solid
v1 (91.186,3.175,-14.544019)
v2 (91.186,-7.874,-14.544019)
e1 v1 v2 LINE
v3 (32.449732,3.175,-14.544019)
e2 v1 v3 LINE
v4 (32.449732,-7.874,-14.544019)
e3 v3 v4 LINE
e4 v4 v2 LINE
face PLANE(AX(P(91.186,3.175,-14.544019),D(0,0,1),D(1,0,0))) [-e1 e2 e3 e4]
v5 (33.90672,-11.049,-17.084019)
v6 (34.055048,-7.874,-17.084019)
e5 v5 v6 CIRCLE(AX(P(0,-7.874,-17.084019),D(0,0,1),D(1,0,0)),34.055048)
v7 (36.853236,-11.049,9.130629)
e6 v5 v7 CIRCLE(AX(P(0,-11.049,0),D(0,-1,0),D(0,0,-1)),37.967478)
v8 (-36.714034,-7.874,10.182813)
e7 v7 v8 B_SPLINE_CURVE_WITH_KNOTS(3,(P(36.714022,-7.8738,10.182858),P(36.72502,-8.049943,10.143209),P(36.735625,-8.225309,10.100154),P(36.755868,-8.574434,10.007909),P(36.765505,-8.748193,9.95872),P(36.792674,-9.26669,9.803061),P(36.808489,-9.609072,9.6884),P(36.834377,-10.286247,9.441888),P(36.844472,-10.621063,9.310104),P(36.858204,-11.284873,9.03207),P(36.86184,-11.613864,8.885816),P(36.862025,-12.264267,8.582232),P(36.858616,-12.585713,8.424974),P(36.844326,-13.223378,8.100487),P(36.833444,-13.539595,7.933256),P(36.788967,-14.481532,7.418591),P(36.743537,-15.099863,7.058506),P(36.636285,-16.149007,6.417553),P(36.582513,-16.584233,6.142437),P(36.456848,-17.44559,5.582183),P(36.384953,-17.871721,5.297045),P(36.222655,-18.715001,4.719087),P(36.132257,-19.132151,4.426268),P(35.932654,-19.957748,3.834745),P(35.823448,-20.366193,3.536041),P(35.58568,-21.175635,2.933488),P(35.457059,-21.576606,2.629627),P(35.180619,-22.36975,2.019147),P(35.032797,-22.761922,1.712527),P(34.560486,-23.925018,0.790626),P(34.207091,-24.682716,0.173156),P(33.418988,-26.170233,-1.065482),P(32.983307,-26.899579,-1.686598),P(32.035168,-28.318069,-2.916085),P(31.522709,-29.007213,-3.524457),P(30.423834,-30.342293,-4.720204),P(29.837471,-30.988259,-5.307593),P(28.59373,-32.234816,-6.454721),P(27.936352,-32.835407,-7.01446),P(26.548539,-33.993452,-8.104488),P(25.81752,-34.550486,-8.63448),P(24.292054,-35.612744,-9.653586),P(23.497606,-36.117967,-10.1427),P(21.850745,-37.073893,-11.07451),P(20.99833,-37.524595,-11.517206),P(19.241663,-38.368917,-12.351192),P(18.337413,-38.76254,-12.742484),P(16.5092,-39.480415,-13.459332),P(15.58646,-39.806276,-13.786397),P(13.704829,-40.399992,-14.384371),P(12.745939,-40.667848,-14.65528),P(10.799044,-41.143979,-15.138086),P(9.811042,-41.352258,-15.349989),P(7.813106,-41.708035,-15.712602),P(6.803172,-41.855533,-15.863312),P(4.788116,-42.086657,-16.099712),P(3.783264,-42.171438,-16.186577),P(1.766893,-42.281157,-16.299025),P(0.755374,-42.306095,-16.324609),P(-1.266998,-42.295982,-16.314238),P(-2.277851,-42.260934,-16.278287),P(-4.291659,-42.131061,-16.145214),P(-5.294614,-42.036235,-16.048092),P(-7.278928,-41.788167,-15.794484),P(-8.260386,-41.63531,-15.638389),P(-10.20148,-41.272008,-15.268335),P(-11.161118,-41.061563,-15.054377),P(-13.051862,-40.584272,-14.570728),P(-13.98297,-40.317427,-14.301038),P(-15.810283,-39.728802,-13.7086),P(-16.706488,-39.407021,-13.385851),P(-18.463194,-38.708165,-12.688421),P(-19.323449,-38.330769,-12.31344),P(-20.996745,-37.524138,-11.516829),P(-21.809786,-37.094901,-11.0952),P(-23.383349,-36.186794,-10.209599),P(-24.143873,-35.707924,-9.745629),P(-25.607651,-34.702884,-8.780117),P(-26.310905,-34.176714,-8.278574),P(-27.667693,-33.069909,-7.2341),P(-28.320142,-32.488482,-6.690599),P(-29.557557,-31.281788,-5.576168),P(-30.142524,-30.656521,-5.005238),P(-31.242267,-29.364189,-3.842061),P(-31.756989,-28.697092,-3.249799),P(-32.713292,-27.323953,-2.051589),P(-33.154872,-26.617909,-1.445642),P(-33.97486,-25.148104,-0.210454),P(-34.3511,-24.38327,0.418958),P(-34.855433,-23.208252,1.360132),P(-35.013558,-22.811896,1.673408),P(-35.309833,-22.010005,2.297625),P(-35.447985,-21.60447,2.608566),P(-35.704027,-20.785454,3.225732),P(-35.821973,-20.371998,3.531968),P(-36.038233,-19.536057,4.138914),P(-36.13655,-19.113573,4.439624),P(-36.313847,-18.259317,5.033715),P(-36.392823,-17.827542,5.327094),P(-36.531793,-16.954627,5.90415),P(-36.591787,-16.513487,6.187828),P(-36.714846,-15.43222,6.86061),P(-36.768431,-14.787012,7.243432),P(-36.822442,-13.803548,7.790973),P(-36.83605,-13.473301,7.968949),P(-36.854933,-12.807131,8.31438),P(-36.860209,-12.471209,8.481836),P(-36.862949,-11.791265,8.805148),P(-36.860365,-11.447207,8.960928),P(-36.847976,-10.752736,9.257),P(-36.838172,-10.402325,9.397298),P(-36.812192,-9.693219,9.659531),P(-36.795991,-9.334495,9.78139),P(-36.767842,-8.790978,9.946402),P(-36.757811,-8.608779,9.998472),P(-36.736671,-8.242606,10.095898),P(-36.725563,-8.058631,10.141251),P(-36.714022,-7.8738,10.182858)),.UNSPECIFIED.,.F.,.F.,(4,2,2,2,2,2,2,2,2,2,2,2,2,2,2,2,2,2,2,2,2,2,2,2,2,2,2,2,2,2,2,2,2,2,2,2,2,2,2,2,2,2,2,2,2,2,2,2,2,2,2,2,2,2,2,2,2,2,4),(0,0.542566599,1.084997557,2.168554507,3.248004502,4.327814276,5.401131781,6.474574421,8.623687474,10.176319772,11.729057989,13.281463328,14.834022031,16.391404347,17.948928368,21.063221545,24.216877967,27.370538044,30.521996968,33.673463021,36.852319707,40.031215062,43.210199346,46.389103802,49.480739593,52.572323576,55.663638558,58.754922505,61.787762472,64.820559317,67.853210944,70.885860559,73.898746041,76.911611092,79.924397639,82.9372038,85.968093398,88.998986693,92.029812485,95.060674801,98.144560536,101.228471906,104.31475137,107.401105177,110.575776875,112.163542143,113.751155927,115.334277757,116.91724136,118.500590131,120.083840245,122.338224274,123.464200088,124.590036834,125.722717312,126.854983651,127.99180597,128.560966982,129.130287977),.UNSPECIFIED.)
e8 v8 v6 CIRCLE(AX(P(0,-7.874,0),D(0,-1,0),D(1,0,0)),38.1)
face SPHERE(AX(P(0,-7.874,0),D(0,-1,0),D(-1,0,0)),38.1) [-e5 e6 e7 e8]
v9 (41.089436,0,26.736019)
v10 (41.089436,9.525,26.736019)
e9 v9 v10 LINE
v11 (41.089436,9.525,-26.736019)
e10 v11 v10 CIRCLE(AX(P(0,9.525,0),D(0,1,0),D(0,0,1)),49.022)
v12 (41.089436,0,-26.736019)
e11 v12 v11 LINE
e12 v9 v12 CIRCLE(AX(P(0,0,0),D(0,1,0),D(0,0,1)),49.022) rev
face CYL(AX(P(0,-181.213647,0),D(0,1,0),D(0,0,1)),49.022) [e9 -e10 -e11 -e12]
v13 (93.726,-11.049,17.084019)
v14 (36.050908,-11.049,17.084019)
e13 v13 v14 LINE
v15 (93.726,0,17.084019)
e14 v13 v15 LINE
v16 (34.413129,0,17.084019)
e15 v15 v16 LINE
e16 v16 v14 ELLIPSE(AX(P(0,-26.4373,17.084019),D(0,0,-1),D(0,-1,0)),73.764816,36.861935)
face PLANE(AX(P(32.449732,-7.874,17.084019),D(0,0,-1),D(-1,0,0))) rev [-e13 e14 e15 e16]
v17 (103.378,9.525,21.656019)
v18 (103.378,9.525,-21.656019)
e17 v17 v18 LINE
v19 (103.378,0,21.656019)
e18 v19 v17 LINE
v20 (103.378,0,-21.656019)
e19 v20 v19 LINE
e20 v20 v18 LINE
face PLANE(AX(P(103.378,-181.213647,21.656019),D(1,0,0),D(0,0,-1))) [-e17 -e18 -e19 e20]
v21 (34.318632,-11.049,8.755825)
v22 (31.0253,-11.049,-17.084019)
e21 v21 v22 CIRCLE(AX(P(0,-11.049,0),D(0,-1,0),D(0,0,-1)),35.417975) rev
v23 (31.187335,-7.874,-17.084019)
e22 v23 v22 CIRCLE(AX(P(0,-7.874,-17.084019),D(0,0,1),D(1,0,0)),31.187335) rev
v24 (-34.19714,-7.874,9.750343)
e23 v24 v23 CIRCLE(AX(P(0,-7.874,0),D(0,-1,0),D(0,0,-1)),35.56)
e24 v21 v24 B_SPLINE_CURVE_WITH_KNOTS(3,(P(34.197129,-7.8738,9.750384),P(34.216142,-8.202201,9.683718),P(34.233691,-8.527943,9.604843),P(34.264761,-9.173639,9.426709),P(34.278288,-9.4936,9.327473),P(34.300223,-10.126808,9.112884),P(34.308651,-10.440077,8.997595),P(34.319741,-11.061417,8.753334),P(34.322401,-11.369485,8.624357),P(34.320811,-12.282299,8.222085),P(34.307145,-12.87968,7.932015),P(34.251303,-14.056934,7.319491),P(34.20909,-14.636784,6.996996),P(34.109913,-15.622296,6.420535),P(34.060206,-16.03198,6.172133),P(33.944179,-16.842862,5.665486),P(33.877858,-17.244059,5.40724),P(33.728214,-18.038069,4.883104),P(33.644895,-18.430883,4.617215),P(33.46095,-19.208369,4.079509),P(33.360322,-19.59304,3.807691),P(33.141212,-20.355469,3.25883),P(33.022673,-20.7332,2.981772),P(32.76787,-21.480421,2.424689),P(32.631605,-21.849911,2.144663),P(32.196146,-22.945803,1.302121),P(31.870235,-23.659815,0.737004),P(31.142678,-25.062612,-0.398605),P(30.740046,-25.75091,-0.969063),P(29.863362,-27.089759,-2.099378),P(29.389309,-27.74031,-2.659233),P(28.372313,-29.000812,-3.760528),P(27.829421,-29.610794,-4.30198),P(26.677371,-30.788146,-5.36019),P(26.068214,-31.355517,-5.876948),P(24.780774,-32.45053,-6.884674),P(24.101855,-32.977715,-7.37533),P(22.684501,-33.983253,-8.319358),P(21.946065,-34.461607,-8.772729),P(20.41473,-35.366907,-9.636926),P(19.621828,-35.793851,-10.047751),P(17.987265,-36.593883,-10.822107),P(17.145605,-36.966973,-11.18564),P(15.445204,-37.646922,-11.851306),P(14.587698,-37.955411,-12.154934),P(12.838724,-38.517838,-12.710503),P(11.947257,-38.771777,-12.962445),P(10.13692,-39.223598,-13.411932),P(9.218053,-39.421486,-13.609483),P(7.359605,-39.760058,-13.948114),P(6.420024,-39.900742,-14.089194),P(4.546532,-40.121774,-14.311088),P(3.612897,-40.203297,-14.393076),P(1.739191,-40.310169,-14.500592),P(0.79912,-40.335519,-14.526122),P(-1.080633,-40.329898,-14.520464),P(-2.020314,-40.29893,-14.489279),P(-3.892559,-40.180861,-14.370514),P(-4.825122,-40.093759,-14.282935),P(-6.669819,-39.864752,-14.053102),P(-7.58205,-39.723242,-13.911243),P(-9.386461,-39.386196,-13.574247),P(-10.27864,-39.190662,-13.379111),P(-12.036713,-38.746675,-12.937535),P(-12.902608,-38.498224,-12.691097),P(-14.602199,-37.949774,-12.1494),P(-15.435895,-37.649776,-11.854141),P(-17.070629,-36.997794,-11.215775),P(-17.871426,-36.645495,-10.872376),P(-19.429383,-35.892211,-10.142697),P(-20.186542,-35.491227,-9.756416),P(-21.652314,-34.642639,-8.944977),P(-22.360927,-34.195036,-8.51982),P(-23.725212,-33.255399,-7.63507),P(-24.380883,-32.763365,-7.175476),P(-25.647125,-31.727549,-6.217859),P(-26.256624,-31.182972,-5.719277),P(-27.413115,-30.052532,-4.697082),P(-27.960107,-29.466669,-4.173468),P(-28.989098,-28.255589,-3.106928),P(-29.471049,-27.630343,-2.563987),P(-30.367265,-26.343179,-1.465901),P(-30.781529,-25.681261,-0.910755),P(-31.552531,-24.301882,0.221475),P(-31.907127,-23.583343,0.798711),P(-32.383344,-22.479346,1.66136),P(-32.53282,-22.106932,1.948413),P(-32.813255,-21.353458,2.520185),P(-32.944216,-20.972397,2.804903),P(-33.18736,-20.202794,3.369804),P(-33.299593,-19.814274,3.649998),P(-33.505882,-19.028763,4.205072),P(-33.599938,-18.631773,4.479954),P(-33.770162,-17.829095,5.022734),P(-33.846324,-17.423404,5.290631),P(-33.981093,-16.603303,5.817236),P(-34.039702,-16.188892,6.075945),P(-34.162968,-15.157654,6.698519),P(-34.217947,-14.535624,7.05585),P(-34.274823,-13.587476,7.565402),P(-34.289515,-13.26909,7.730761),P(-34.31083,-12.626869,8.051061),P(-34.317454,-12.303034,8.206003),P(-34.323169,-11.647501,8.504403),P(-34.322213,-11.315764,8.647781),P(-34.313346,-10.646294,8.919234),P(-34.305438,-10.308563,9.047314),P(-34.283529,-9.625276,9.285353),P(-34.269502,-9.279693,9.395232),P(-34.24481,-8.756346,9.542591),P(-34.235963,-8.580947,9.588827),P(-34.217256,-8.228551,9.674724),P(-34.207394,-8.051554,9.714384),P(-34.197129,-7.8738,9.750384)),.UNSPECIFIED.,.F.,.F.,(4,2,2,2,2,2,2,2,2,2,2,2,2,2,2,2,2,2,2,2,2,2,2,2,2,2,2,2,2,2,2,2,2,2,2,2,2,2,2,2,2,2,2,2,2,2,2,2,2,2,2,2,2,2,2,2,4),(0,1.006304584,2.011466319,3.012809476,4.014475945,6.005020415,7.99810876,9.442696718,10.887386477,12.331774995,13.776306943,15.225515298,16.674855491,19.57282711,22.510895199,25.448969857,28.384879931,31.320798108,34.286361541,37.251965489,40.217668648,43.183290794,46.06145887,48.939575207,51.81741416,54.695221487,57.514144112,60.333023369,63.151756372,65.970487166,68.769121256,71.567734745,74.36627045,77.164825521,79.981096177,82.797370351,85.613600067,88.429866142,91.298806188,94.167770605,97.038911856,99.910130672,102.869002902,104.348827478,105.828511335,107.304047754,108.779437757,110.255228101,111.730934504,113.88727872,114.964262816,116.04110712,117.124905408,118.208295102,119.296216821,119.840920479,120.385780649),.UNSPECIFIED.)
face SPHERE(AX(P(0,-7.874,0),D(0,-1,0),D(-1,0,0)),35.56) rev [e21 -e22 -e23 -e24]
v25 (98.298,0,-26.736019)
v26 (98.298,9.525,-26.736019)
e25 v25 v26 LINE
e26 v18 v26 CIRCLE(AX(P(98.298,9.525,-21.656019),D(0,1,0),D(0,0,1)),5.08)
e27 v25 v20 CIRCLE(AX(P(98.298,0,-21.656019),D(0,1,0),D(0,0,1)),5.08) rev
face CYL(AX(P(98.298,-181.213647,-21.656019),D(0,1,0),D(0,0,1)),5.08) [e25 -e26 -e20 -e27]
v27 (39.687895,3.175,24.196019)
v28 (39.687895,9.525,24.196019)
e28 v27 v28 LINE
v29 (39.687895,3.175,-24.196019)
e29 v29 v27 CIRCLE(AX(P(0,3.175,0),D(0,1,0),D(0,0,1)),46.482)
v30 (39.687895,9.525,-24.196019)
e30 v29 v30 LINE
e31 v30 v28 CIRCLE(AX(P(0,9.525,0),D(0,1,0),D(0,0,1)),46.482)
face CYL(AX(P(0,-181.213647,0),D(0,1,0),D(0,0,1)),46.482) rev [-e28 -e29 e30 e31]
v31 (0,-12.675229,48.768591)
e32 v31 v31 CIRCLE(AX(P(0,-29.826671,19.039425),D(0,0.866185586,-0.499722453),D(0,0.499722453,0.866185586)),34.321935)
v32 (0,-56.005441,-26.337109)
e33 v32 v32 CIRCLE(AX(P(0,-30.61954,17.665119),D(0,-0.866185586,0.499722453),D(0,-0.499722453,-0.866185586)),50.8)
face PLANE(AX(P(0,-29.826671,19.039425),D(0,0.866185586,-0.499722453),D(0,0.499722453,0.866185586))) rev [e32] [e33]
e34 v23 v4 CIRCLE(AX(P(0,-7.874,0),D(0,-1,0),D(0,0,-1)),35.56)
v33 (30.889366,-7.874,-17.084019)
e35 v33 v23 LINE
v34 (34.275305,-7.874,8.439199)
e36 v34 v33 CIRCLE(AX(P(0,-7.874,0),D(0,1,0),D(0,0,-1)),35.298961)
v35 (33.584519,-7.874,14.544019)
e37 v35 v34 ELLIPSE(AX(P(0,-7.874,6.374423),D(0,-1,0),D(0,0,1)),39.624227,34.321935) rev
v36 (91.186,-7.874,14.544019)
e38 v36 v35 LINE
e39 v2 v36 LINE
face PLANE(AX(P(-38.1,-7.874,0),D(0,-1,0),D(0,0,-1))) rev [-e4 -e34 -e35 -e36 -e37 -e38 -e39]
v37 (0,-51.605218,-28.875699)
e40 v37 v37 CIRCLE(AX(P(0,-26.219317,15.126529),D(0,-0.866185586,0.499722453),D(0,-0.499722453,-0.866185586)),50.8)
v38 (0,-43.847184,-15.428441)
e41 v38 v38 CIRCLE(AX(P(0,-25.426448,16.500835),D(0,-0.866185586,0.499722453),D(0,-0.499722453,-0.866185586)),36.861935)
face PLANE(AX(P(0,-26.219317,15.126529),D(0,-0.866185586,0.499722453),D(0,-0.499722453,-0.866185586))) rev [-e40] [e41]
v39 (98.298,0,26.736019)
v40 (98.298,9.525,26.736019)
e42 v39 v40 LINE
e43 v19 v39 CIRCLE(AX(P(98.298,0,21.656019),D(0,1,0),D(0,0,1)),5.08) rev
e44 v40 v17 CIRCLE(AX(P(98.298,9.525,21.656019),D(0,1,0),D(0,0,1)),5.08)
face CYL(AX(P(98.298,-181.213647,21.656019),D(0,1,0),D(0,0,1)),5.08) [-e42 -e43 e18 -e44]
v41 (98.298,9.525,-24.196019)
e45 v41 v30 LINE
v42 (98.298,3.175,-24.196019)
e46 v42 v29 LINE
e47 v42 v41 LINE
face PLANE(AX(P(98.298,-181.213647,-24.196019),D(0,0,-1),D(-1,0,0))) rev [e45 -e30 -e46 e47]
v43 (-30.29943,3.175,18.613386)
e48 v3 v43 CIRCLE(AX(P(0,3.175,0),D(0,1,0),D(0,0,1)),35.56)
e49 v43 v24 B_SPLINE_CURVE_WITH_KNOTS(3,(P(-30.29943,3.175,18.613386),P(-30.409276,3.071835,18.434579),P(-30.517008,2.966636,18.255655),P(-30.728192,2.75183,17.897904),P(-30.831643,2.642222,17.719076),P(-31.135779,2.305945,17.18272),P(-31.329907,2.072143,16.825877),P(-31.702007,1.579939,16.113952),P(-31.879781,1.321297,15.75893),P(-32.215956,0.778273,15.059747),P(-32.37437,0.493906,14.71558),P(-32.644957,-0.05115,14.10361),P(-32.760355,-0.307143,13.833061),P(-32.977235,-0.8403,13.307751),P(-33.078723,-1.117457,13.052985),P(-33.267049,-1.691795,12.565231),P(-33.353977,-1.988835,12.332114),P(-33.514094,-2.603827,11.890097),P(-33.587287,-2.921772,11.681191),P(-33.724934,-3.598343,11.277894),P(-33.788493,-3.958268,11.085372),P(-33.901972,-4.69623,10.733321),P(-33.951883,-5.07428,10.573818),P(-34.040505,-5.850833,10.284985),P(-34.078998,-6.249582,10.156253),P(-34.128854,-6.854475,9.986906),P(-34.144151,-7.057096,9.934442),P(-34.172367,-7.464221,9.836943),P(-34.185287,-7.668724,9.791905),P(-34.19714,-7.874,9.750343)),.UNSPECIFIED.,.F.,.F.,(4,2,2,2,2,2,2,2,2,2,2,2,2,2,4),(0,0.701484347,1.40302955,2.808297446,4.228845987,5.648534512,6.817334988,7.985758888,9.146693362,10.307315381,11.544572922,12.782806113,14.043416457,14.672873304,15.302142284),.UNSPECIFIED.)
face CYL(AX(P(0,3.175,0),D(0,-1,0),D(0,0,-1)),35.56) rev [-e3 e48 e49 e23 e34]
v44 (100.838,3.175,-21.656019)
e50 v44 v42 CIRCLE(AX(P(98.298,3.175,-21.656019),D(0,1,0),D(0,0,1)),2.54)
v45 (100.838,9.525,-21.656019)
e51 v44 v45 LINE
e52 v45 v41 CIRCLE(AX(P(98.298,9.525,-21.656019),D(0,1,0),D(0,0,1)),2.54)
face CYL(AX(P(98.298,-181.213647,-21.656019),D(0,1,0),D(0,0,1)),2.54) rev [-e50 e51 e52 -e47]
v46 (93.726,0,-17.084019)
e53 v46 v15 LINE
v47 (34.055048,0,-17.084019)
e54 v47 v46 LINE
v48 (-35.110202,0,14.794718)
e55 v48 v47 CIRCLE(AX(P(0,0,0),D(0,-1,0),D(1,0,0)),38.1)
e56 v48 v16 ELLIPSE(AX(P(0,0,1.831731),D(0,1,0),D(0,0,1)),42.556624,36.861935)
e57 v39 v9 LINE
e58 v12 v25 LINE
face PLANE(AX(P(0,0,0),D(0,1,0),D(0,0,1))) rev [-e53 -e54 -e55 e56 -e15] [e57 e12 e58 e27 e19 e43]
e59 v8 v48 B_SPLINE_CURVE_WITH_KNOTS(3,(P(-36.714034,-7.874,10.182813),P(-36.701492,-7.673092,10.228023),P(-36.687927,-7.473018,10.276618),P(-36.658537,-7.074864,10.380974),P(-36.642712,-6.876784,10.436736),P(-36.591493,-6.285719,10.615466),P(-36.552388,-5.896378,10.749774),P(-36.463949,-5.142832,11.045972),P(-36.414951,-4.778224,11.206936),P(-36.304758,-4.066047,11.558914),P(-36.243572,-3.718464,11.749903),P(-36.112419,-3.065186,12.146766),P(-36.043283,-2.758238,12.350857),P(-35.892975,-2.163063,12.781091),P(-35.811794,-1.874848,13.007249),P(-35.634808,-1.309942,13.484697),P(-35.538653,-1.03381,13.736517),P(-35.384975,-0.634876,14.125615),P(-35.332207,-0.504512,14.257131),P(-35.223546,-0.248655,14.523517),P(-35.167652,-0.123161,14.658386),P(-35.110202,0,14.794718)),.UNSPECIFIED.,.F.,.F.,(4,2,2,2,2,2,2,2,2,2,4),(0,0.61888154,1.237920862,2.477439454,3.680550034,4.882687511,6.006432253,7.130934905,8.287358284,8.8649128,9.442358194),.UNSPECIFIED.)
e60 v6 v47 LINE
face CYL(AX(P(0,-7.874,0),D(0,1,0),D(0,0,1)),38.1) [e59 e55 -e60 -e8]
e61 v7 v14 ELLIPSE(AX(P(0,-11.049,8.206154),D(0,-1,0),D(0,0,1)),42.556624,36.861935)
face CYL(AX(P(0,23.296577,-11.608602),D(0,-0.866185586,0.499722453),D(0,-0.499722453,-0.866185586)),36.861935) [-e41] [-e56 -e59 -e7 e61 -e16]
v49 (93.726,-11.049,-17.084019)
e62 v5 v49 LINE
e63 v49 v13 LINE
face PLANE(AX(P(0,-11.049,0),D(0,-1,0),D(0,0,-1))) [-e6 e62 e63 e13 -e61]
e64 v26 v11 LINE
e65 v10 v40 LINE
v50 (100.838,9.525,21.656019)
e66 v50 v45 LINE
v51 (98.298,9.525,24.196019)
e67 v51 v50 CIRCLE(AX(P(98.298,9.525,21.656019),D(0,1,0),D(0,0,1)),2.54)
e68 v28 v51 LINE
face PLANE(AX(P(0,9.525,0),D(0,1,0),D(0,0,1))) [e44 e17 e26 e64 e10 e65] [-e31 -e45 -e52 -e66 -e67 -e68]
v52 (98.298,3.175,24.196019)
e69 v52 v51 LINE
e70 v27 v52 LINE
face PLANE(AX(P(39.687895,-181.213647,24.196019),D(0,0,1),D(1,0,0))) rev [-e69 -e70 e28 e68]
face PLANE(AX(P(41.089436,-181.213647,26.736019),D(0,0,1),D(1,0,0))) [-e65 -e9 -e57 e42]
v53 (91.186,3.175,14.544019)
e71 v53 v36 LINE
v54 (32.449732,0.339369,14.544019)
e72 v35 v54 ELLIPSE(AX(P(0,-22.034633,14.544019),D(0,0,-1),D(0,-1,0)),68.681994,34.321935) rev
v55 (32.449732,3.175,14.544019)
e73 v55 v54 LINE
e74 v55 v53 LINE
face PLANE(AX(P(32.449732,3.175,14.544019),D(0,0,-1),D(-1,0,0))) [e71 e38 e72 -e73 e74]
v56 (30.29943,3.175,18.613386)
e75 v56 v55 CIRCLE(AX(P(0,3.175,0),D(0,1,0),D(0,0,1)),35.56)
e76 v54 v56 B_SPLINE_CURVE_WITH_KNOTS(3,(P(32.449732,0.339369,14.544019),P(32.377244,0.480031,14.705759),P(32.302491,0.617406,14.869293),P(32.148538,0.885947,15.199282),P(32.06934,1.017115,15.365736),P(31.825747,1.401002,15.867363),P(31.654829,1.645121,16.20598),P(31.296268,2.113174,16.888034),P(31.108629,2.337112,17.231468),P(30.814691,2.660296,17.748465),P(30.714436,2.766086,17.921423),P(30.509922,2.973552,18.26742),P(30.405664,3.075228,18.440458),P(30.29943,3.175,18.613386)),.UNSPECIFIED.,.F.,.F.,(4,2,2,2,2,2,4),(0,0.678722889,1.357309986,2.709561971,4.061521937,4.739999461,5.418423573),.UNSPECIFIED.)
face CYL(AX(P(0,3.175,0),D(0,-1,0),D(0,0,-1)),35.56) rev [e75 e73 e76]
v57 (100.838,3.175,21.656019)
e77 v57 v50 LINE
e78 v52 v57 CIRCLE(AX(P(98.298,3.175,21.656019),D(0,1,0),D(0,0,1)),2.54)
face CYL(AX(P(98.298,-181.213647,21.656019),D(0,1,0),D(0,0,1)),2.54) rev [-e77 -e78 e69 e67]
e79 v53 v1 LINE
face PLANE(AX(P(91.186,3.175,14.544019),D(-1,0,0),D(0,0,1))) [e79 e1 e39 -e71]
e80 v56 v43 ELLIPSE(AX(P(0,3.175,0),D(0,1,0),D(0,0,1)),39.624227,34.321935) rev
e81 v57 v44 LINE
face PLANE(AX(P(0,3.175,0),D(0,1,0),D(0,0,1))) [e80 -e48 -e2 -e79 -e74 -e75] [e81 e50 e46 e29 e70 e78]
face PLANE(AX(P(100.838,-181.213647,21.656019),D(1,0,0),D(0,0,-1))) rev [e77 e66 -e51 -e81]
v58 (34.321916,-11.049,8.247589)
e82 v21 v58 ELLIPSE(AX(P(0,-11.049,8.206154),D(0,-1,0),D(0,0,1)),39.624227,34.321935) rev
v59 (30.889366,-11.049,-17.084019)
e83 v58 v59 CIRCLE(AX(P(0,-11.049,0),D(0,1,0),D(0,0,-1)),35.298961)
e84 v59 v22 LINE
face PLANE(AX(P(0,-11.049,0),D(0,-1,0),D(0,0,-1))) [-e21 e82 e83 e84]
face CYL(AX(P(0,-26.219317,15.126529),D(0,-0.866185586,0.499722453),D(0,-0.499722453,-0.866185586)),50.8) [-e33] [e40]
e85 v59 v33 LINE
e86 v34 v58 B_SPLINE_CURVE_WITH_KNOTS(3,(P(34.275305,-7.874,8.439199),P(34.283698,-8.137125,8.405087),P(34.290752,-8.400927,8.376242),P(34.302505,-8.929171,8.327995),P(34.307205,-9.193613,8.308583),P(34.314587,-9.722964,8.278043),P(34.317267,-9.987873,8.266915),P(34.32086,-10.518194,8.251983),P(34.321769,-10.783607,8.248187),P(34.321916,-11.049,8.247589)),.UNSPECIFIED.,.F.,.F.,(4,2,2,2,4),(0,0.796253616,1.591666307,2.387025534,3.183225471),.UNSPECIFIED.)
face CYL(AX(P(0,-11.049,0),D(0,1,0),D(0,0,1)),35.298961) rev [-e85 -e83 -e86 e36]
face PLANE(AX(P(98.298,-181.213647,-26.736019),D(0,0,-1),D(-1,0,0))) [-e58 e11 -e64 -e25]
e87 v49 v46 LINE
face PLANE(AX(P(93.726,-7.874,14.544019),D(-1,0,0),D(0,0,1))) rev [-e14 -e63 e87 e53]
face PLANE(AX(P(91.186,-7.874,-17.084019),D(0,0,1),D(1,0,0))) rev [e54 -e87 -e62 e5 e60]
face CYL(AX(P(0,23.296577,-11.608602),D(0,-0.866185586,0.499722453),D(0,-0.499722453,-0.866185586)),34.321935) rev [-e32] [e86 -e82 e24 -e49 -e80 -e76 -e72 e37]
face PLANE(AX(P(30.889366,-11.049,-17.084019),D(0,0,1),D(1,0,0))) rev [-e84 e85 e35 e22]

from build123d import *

# Parameters (mm, degrees)
BOSS_EXTRUDE1_DEPTH     = 3.175
EXTRUDE_THIN1_START     = 7.874
EXTRUDE_THIN1_DEPTH     = 7.874
BOSS_EXTRUDE2_DEPTH     = 3.175
EXTRUDE_THIN2_REACH     = 134.494
SKETCH7_R               = 36.861935
SKETCH7_R_2             = 34.321935
CUT_EXTRUDE1_DEPTH      = 44.45
CUT_EXTRUDE1_DEPTH_BACK = 13.335
SKETCH8_R               = 34.321935
SKETCH10_R              = 50.8
SKETCH10_R_2            = 34.321935
BOSS_EXTRUDE3_DEPTH     = 5.08
FILLET1_START           = -1
FILLET1_DEPTH           = 5
BOSS_EXTRUDE4_START     = -3.175
BOSS_EXTRUDE4_DEPTH     = 9.525


with BuildPart() as part:
    # Sketch1 → Boss-Extrude1 (new body)
    with BuildSketch(Plane(origin=(0, 0, 0), x_dir=(1, 0, 0), z_dir=(0, 1, 0))):
        with BuildLine():
            Line((39.687895, -24.196019), (100.838, -24.196019))
            Line((100.838, -24.196019), (100.838, 24.196019))
            Line((100.838, 24.196019), (39.687895, 24.196019))
            ThreePointArc((39.687895, 24.196019), (-46.482, 0), (39.687895, -24.196019))
        make_face()
        with BuildLine():
            Line((32.449732, -14.544019), (91.186, -14.544019))
            Line((91.186, -14.544019), (91.186, 14.544019))
            Line((91.186, 14.544019), (32.449732, 14.544019))
            ThreePointArc((32.449732, 14.544019), (-35.56, 0), (32.449732, -14.544019))
        make_face(mode=Mode.SUBTRACT)
    extrude(amount=BOSS_EXTRUDE1_DEPTH)

    # Sketch4 → Extrude-Thin1 (add)
    with BuildSketch(Plane.XZ.offset(EXTRUDE_THIN1_START)):
        with BuildLine():
            Line((34.055048, 17.084019), (93.726, 17.084019))
            Line((93.726, 17.084019), (93.726, -17.084019))
            Line((93.726, -17.084019), (34.055048, -17.084019))
            ThreePointArc((34.055048, -17.084019), (-38.1, 0), (34.055048, 17.084019))
        make_face()
        with BuildLine():
            Line((32.449732, 14.544019), (91.186, 14.544019))
            Line((91.186, 14.544019), (91.186, -14.544019))
            Line((91.186, -14.544019), (32.449732, -14.544019))
            ThreePointArc((32.449732, -14.544019), (-35.56, 0), (32.449732, 14.544019))
        make_face(mode=Mode.SUBTRACT)
    extrude(amount=-EXTRUDE_THIN1_DEPTH)

    # Sketch5 → Revolve1 (revolve)
    with BuildSketch(Plane.XY):
        with BuildLine():
            Line((0, -43.434), (0, -45.974))
            ThreePointArc((0, -45.974), (-26.940768, -34.814768), (-38.1, -7.874))
            Line((-38.1, -7.874), (-35.56, -7.874))
            ThreePointArc((-35.56, -7.874), (-25.144717, -33.018717), (0, -43.434))
        make_face()
    revolve(axis=Axis((0, -50.818528, 0), (0, 1, 0)))

    # Sketch6 → Boss-Extrude2 (add)
    with BuildSketch(Plane.XZ.offset(7.874)):
        with BuildLine():
            Line((30.889366, -17.084019), (93.726, -17.084019))
            Line((93.726, -17.084019), (93.726, 17.084019))
            Line((93.726, 17.084019), (30.889366, 17.084019))
            ThreePointArc((30.889366, 17.084019), (35.298961, 0), (30.889366, -17.084019))
        make_face()
    extrude(amount=BOSS_EXTRUDE2_DEPTH)

    # Sketch7 → Extrude-Thin2 (add, up to next)
    with BuildSketch(Plane(origin=(0, -20.306958, 35.540261), x_dir=(1, 0, 0), z_dir=(0, 0.8661855860486005, -0.49972245348957706)), mode=Mode.PRIVATE) as extrude_thin2_sk1:
        with Locations((0, 19.05)):
            Circle(SKETCH7_R)
        with Locations((0, 19.05)):
            Circle(SKETCH7_R_2, mode=Mode.SUBTRACT)
    extrude_thin2_tool1 = extrude(extrude_thin2_sk1.sketch, amount=EXTRUDE_THIN2_REACH, mode=Mode.PRIVATE) - part.part
    add(extrude_thin2_tool1.solids().sort_by_distance((-35.819322, -29.826671, 19.039425))[0])

    # Sketch8 → Cut-Extrude1 (cut, two sides: drawn at the far end of the back side and taken through both)
    with BuildSketch(Plane(origin=(0, -20.306958, 35.540261), x_dir=(1, 0, 0), z_dir=(0, 0.8661855860486005, -0.49972245348957706)).offset(-CUT_EXTRUDE1_DEPTH_BACK)):
        with Locations(Location((0, 19.05, 0), (0, 0, 359.940086))):
            Circle(SKETCH8_R)
    extrude(amount=CUT_EXTRUDE1_DEPTH + CUT_EXTRUDE1_DEPTH_BACK, mode=Mode.SUBTRACT)

    # Sketch10 → Boss-Extrude3 (add)
    with BuildSketch(Plane(origin=(0, -30.61954, 17.665119), x_dir=(1, 0, 0), z_dir=(0, -0.8661855860486006, 0.49972245348957695))):
        with Locations(Location((0, 0, 0), (0, 0, 270))):
            Circle(SKETCH10_R)
        with Locations(Location((0, 1.586619, 0), (0, 0, 0.059914))):
            Circle(SKETCH10_R_2, mode=Mode.SUBTRACT)
    extrude(amount=-BOSS_EXTRUDE3_DEPTH)

    # Fillet1: read off the stored shape, not the designer's step
    # Fillet1 outline → Fillet1 (cut)
    with BuildSketch(Plane(origin=(0, 0, 0), x_dir=(1, 0, 0), z_dir=(0, 1, 0)).offset(FILLET1_START)):
        with BuildLine():
            Line((100.838, -24.196019), (100.838, -21.656019))
            ThreePointArc((100.838, -21.656019), (100.094051, -23.45207), (98.298, -24.196019))
            Line((98.298, -24.196019), (100.838, -24.196019))
        make_face()
        with BuildLine():
            ThreePointArc((98.298, 24.196019), (100.094051, 23.45207), (100.838, 21.656019))
            Line((100.838, 21.656019), (100.838, 24.196019))
            Line((100.838, 24.196019), (98.298, 24.196019))
        make_face()
    extrude(amount=FILLET1_DEPTH, mode=Mode.SUBTRACT)

    # Boss-Extrude4: read off the stored shape, not the designer's step
    # Boss-Extrude4 outline → Boss-Extrude4 (add)
    with BuildSketch(Plane(origin=(0, 3.175, 0), x_dir=(1, 0, 0), z_dir=(0, 1, 0)).offset(BOSS_EXTRUDE4_START)):
        with BuildLine():
            ThreePointArc((41.089436, 26.736019), (-49.022, 0), (41.089436, -26.736019))
            Line((41.089436, -26.736019), (98.298, -26.736019))
            ThreePointArc((98.298, -26.736019), (101.890102, -25.248122), (103.378, -21.656019))
            Line((103.378, -21.656019), (103.378, 21.656019))
            ThreePointArc((103.378, 21.656019), (101.890102, 25.248122), (98.298, 26.736019))
            Line((98.298, 26.736019), (41.089436, 26.736019))
        make_face()
        with BuildLine():
            Line((98.298, -24.196019), (39.687895, -24.196019))
            ThreePointArc((39.687895, -24.196019), (-46.482, 0), (39.687895, 24.196019))
            Line((39.687895, 24.196019), (98.298, 24.196019))
            ThreePointArc((98.298, 24.196019), (100.094051, 23.45207), (100.838, 21.656019))
            Line((100.838, 21.656019), (100.838, -21.656019))
            ThreePointArc((100.838, -21.656019), (100.094051, -23.45207), (98.298, -24.196019))
        make_face(mode=Mode.SUBTRACT)
    extrude(amount=BOSS_EXTRUDE4_DEPTH)


solid = part.part
